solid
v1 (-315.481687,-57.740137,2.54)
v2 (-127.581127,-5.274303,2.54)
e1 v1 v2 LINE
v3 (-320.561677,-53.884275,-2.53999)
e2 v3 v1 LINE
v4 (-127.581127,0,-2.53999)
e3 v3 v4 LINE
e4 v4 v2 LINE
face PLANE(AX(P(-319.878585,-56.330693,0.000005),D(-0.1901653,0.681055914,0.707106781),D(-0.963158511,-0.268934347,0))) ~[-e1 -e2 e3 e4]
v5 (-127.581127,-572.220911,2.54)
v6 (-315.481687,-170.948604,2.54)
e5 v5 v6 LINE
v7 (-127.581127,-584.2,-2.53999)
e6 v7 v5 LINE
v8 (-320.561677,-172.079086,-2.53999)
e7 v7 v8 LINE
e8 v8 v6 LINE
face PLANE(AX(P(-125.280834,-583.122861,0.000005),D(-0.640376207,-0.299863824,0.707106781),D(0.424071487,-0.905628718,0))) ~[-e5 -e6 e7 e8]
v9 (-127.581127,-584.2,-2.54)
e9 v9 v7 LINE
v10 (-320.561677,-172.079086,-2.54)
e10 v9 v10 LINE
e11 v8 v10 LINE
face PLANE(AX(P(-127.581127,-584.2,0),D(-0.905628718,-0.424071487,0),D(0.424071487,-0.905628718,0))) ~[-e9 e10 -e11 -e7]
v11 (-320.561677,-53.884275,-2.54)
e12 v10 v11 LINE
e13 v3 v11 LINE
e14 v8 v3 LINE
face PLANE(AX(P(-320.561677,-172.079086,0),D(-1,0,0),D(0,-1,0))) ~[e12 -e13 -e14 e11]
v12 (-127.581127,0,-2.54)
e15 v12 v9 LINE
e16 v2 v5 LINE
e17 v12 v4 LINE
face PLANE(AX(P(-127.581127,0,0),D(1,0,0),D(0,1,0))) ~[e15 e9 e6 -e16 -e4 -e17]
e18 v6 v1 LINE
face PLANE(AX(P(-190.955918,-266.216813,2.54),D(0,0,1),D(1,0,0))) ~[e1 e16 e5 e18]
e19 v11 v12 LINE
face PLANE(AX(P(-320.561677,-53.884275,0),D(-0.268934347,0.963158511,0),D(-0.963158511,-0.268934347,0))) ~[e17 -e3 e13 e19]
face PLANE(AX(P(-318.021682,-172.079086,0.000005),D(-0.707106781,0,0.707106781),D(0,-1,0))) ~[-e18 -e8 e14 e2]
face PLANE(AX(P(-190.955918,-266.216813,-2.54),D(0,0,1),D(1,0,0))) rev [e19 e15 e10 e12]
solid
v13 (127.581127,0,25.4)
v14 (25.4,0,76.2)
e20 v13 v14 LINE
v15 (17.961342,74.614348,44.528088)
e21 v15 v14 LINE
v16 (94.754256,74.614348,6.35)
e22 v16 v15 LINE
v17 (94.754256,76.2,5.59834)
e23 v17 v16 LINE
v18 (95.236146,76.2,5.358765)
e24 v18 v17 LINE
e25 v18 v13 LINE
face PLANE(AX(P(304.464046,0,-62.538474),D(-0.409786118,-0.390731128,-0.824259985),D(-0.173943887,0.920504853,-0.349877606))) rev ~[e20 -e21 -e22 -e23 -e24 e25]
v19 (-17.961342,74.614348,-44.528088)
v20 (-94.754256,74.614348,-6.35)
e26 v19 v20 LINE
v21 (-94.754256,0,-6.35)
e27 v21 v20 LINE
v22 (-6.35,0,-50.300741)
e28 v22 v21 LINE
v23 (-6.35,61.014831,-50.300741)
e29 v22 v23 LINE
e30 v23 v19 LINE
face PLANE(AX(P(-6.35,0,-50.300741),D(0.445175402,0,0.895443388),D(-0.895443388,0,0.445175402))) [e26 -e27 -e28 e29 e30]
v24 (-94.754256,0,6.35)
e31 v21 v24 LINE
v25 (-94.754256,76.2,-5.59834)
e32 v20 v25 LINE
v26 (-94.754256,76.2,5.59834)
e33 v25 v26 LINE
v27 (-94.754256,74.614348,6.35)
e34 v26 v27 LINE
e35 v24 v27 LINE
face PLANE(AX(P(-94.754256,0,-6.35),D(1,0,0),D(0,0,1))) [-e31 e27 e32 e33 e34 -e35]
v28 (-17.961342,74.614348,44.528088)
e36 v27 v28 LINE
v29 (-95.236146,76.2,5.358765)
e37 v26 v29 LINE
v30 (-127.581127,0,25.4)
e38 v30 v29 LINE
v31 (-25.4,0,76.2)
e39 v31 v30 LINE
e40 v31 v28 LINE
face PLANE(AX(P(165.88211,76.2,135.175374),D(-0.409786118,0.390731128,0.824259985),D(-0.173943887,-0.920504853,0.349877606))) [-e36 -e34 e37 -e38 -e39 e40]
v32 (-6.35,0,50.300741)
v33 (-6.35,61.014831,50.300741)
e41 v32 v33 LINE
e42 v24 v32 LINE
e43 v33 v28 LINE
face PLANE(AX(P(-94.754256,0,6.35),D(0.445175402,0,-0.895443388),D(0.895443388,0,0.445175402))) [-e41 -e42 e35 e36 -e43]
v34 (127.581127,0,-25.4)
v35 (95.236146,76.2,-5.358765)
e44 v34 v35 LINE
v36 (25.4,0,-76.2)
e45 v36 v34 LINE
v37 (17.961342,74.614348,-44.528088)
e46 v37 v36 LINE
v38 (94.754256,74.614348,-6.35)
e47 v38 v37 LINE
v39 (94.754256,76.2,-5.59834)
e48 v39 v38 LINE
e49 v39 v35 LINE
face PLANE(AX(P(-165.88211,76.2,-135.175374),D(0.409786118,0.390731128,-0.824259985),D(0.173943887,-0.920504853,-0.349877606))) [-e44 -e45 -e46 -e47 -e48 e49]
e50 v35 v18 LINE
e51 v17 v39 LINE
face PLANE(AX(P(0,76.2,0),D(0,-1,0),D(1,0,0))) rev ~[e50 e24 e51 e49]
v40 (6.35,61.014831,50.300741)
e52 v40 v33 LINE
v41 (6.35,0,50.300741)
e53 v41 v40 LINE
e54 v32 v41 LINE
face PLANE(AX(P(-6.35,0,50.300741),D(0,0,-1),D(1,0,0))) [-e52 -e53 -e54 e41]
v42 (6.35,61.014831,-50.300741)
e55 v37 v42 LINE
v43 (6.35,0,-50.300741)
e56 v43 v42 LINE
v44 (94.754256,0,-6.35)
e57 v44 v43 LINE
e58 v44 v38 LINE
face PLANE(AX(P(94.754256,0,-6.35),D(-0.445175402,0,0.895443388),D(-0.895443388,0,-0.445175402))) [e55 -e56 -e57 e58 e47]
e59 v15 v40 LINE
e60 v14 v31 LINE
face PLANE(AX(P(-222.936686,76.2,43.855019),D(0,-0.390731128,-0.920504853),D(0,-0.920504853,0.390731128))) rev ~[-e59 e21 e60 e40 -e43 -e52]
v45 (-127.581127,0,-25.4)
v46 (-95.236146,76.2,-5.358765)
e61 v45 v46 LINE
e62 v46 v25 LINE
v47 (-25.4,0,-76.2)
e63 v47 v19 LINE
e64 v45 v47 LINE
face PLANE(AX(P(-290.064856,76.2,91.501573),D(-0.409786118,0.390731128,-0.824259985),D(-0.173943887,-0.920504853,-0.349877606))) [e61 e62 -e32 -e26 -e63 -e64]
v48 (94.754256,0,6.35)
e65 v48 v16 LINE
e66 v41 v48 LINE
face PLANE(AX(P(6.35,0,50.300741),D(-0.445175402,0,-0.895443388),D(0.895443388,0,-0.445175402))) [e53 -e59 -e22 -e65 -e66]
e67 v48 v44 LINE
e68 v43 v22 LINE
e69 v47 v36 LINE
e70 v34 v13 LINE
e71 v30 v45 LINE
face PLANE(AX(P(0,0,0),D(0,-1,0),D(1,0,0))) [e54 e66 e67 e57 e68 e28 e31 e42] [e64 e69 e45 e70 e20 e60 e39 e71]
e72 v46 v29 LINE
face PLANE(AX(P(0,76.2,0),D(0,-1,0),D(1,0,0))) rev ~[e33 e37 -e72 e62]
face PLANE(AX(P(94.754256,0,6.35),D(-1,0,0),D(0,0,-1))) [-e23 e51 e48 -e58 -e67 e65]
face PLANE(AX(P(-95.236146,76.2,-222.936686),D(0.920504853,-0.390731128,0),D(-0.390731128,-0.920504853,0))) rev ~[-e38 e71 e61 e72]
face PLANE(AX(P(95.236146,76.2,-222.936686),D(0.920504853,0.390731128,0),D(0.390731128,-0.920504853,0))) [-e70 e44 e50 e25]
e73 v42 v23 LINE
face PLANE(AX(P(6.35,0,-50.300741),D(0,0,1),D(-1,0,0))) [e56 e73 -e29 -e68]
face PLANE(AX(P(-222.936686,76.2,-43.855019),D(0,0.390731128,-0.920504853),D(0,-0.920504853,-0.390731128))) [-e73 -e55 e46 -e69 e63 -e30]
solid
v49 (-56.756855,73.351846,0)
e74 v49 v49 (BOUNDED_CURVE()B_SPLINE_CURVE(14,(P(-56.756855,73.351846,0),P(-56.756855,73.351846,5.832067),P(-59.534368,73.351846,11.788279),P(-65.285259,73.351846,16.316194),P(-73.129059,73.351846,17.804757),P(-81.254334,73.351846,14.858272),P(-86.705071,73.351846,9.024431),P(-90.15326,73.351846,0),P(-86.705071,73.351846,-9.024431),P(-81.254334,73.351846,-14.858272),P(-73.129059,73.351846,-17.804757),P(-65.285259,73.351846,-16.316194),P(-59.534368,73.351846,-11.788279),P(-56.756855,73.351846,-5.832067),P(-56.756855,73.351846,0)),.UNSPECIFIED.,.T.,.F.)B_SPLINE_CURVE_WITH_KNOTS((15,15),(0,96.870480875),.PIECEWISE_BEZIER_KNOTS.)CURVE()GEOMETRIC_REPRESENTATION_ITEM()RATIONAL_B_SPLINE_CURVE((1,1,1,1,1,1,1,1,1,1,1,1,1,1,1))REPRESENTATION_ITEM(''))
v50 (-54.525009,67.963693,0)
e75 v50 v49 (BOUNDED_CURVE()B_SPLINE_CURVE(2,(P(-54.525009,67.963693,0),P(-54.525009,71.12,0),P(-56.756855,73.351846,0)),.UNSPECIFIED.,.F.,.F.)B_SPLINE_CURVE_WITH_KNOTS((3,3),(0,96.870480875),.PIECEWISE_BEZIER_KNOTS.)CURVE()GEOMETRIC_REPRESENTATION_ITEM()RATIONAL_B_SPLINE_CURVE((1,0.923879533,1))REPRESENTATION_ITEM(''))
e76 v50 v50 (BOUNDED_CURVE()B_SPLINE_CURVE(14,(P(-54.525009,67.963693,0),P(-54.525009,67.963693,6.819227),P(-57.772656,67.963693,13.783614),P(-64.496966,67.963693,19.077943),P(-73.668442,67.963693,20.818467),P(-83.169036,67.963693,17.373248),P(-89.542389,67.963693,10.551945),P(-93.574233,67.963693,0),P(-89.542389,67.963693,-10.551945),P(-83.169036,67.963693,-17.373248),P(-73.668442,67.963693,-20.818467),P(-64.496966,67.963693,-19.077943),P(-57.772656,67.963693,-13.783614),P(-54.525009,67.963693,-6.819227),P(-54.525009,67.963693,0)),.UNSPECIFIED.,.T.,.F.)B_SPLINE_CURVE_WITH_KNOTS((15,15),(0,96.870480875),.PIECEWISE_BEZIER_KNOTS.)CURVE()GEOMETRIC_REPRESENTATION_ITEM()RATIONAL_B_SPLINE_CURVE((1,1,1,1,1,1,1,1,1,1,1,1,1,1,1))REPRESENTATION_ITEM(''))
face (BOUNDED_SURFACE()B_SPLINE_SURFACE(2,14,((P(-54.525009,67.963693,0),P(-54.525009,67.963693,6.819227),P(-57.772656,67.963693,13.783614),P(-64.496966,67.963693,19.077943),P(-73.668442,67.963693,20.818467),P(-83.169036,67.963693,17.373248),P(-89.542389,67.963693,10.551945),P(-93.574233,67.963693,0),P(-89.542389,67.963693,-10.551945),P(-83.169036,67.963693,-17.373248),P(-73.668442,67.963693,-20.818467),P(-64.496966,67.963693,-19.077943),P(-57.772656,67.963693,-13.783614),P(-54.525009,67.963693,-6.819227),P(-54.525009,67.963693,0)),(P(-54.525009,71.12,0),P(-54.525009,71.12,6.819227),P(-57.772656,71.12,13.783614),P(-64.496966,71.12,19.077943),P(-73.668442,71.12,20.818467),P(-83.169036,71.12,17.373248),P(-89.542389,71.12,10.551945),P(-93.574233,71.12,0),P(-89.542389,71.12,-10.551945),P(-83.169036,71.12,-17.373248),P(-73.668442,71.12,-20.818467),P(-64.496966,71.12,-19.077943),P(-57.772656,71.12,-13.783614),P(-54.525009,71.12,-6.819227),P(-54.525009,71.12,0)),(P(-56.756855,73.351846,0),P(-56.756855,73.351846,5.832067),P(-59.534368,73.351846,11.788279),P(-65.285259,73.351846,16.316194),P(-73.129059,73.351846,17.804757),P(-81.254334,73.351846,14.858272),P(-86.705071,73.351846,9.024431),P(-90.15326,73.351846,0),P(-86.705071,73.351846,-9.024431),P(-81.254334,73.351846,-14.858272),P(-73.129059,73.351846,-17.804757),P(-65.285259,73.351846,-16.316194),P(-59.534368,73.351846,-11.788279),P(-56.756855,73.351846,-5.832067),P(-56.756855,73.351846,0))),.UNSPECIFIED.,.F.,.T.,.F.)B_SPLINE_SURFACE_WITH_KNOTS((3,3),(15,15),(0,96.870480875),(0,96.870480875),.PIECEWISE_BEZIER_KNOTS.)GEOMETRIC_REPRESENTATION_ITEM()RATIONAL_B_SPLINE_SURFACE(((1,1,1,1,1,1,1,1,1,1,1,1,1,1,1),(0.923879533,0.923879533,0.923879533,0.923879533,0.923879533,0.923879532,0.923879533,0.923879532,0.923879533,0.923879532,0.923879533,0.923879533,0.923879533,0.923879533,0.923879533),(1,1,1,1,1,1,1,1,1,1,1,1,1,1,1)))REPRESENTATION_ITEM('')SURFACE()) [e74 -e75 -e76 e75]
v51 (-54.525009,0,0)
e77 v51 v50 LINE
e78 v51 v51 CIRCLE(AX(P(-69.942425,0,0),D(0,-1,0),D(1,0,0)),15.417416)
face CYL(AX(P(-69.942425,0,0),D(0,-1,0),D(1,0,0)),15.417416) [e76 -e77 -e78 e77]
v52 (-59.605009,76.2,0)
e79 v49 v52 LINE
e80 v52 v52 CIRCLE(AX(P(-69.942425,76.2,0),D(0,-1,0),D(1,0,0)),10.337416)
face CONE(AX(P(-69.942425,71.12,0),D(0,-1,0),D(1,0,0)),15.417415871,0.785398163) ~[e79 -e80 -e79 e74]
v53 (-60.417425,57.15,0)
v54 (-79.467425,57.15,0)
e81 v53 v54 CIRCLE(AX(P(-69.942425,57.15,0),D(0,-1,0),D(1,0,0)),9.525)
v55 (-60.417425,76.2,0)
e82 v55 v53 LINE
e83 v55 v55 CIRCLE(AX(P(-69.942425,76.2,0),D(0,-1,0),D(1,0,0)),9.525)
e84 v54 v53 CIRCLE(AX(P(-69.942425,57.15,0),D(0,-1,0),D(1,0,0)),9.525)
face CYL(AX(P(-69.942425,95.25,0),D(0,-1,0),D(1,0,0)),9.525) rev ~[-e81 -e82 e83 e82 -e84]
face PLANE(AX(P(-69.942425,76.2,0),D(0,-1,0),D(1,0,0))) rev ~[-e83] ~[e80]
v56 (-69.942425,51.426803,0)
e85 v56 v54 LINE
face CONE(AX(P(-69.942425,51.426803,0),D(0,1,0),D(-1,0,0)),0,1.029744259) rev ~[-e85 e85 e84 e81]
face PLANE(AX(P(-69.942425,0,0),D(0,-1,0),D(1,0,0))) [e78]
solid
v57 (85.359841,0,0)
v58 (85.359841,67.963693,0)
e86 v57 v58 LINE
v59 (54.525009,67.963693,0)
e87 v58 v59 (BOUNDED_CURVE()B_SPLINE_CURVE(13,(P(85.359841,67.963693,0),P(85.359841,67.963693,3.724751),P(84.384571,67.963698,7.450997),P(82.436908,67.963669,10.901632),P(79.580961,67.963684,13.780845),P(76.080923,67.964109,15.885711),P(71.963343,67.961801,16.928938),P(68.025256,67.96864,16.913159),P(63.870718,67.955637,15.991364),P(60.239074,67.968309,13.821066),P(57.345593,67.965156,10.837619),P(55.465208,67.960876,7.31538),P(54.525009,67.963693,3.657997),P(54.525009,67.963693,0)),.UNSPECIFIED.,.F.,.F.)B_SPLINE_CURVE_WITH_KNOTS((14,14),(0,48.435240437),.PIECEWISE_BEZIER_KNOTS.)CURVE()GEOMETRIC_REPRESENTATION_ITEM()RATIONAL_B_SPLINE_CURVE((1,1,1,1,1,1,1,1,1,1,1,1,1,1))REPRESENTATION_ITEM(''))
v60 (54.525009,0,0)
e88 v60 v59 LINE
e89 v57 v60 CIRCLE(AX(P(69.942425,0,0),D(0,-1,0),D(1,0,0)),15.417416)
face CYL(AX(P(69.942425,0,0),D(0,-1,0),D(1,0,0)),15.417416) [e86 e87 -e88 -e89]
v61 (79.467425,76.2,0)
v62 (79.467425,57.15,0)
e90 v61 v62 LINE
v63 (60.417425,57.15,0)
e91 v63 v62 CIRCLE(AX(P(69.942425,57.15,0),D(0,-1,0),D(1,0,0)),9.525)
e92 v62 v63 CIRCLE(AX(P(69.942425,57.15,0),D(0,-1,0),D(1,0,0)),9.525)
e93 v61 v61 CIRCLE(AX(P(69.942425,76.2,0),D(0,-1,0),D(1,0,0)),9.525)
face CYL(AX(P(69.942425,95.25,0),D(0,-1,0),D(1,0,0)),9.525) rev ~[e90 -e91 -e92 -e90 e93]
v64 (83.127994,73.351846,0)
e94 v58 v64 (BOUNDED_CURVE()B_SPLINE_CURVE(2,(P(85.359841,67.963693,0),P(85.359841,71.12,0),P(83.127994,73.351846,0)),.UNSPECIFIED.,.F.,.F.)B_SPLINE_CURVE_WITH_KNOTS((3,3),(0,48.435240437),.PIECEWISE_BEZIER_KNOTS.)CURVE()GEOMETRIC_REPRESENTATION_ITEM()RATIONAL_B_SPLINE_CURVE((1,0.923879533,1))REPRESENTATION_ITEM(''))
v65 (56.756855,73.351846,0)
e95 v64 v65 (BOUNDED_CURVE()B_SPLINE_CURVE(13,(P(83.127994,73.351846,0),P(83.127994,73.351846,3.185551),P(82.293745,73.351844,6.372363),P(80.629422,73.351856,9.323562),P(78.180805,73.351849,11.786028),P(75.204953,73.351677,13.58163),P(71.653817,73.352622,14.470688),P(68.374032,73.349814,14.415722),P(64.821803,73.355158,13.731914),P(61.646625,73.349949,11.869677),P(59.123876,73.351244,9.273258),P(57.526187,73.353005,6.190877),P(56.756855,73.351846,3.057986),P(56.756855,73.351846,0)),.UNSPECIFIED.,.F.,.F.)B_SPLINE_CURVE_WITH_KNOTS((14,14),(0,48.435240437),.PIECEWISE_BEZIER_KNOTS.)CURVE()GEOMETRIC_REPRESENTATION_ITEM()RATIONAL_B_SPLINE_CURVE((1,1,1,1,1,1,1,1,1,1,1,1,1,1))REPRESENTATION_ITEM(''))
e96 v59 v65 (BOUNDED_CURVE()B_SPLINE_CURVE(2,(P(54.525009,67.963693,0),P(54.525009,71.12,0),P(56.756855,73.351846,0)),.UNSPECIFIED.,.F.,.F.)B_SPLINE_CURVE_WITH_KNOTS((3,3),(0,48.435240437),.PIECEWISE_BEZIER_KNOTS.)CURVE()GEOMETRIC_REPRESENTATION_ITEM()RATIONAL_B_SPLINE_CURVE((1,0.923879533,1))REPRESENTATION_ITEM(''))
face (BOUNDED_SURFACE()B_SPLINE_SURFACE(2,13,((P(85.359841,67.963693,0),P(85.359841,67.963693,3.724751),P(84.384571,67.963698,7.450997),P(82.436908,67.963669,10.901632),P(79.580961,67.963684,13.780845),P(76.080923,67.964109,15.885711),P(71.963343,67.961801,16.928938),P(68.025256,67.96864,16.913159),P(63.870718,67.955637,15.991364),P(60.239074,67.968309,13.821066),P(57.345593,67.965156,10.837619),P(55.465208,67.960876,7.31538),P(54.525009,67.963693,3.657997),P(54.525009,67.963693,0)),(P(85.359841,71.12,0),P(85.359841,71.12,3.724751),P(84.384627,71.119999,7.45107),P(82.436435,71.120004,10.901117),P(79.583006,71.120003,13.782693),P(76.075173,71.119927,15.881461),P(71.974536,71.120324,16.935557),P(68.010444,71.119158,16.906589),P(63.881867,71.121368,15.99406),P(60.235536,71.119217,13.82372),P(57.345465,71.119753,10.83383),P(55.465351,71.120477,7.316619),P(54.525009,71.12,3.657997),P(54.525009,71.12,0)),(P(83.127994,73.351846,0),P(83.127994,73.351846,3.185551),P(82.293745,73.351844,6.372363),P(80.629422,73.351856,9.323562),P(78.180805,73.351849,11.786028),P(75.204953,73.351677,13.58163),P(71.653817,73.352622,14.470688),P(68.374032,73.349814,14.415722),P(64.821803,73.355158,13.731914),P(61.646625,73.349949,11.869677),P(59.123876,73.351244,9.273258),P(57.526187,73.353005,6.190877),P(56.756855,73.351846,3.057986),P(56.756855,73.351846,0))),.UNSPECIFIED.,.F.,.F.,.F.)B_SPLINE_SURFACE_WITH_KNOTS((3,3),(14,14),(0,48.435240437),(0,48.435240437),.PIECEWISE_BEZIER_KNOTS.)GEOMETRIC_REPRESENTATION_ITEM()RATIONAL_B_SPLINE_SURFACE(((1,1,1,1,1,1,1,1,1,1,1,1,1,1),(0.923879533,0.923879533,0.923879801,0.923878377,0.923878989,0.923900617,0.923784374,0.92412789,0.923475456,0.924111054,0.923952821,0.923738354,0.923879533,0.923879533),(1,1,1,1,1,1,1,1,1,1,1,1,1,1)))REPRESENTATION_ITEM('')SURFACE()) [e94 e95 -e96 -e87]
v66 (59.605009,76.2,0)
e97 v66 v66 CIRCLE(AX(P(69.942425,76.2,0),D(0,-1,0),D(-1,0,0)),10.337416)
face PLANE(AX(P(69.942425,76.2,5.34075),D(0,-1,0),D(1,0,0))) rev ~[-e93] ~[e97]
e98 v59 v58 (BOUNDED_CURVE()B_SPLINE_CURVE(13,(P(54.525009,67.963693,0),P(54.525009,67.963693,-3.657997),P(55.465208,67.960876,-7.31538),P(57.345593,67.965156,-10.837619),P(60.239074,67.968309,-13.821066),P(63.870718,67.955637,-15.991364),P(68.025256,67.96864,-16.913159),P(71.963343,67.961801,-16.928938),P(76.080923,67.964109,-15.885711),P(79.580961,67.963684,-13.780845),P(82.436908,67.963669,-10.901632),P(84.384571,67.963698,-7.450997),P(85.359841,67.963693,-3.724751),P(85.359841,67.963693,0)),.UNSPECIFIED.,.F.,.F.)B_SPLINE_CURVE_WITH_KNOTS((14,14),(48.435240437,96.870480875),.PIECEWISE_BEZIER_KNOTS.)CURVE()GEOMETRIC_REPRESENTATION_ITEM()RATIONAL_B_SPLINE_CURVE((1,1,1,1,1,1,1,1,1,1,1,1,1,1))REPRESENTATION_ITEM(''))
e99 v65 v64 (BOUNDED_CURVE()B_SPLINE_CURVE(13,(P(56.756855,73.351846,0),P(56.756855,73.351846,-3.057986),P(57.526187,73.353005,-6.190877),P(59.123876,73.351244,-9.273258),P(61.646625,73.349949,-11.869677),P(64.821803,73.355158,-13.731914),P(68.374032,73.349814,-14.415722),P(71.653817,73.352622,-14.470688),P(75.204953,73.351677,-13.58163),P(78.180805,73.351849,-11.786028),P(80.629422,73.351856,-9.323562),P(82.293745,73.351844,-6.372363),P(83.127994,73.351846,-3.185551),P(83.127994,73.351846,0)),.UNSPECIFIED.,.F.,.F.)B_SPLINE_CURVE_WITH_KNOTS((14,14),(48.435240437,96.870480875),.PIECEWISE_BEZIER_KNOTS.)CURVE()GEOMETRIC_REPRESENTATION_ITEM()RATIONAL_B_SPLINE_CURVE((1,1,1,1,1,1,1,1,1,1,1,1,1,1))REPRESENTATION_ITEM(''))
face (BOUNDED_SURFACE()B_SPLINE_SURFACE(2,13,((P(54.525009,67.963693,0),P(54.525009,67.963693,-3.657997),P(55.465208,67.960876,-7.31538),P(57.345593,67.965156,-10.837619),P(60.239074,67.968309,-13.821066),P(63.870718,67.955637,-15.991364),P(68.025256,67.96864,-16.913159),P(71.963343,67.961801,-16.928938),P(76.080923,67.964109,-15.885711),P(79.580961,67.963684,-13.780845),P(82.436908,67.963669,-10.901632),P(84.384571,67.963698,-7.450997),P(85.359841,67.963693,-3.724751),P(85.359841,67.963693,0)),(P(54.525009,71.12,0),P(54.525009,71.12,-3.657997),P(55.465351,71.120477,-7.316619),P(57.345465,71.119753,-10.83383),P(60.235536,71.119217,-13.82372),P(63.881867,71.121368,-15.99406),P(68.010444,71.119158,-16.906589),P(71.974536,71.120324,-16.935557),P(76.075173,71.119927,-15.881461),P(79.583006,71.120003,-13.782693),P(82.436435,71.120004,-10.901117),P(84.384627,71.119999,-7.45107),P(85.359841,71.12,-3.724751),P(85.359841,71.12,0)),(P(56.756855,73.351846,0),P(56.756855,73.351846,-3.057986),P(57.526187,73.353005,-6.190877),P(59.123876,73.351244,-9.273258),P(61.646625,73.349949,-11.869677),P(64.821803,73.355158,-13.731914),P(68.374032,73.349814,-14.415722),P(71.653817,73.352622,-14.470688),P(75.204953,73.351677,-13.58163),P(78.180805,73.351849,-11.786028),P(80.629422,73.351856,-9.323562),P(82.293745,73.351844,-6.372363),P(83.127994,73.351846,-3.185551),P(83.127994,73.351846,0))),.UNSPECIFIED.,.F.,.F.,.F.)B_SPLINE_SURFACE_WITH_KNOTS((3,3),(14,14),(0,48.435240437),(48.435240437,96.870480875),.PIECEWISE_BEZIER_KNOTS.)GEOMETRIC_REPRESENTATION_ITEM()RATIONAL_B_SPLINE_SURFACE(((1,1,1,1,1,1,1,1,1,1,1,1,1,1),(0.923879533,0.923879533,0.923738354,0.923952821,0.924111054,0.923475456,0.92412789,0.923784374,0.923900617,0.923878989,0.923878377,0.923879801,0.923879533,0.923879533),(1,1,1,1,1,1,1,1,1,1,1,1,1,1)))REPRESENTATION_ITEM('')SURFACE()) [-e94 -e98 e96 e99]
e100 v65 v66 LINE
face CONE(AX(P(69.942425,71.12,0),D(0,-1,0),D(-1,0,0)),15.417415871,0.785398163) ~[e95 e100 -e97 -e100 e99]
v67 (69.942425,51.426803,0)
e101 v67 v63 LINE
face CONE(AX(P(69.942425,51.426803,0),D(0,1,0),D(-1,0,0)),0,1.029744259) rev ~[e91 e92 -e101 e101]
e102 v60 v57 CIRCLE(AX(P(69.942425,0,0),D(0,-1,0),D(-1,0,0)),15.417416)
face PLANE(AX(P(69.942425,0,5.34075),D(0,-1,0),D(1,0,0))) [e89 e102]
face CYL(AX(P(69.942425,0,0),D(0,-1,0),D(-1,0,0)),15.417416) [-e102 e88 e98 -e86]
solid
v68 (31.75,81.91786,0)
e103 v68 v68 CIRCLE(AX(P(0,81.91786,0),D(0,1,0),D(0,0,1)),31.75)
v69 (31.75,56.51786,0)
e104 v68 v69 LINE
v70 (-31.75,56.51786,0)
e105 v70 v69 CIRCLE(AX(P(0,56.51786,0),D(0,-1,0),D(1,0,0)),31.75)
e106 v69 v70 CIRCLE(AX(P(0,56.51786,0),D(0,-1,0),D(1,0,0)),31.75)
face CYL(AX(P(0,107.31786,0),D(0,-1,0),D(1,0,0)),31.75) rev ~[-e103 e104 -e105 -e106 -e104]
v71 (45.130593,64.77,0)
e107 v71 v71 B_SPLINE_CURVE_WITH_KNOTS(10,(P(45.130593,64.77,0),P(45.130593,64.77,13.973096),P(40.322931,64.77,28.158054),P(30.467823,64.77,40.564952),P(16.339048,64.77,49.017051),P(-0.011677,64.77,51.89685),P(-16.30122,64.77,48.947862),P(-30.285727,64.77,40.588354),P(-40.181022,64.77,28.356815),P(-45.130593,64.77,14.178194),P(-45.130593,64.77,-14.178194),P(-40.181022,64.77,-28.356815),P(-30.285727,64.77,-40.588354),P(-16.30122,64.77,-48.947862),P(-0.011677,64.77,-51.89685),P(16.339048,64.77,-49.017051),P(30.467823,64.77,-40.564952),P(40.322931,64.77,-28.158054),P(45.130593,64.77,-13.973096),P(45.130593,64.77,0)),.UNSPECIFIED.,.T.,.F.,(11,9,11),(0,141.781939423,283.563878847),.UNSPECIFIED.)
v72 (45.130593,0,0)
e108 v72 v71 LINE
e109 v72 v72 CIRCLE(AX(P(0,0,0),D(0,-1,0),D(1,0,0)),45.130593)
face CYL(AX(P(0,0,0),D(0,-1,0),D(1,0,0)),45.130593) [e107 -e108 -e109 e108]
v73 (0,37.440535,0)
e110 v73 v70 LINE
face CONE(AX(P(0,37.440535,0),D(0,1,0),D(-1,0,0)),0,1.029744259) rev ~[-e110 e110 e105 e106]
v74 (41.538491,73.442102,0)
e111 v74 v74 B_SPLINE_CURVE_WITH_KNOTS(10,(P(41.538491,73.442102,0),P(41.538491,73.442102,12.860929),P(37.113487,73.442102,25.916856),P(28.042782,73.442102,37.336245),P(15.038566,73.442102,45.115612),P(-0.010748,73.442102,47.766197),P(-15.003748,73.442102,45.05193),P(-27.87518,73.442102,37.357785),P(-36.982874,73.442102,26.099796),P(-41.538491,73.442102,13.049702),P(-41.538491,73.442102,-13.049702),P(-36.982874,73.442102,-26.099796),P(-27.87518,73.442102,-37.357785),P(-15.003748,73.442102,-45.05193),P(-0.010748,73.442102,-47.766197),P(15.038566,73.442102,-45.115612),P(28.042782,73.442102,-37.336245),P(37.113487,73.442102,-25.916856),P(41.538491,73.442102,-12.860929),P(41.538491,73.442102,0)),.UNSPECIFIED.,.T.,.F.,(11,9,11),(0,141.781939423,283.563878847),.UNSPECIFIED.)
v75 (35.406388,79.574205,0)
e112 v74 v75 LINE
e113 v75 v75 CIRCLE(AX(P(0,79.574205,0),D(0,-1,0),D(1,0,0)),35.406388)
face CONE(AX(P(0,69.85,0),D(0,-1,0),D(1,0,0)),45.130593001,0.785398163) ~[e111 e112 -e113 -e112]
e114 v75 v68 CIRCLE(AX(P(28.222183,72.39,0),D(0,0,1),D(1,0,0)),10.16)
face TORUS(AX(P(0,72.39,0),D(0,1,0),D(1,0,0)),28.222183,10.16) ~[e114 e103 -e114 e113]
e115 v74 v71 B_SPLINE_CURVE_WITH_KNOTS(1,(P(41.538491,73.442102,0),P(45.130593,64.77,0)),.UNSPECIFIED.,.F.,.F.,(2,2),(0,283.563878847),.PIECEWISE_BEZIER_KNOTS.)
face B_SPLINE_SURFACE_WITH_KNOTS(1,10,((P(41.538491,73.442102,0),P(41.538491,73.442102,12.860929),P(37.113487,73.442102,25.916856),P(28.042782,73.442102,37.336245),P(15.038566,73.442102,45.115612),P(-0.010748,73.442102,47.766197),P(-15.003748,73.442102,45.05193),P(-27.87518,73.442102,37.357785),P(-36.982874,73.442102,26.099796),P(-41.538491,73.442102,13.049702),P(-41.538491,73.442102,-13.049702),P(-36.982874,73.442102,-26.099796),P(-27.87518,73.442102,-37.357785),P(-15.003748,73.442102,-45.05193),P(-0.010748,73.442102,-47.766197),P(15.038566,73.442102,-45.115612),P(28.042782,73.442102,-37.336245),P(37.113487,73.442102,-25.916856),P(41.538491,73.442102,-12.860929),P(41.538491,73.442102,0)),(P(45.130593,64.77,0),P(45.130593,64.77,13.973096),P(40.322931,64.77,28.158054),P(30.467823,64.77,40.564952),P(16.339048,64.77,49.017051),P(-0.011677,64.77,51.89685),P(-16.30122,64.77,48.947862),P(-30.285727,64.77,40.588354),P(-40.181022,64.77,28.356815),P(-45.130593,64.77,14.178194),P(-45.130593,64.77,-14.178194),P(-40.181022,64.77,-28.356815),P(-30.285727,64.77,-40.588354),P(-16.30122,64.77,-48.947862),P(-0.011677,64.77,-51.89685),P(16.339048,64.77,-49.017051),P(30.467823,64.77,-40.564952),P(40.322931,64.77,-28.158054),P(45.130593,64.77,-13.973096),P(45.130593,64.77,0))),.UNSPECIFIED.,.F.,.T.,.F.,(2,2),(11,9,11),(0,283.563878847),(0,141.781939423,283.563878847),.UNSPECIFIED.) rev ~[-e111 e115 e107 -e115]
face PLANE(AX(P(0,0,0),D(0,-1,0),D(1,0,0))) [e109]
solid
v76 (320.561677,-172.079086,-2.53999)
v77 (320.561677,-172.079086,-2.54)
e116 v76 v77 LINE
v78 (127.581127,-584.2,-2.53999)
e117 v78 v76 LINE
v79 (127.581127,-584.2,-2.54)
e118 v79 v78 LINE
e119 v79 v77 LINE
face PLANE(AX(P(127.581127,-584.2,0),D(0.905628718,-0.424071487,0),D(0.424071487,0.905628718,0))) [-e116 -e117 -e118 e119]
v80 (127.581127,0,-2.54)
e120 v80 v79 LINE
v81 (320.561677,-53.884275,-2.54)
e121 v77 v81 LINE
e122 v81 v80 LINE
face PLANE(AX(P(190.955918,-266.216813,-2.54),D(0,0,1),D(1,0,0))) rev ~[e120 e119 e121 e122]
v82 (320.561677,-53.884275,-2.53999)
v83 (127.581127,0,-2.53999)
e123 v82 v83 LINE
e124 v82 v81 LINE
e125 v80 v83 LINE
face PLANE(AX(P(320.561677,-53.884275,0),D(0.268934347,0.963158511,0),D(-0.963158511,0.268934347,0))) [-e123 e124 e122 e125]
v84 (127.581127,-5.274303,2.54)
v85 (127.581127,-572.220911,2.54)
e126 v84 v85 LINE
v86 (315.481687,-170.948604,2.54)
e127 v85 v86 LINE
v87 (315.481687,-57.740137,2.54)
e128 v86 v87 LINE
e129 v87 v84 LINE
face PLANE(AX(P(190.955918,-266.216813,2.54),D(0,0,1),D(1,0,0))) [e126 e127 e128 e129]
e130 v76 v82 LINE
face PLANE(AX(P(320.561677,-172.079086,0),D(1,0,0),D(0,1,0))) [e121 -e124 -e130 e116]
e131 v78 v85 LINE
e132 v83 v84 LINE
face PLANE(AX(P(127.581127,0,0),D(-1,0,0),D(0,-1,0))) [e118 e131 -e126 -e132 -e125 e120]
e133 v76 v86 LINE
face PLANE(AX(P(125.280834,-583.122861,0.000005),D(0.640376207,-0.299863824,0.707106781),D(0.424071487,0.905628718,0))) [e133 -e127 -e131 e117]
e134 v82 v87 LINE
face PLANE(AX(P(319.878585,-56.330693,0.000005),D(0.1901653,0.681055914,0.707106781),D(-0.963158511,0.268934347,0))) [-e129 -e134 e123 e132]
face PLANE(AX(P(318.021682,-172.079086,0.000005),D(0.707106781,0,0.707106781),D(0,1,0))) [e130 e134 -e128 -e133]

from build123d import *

# Parameters (mm, degrees)
F1_DEPTH         = 2.54
F1_DEPTH_BACK    = 2.54
F2_SIZE          = 5.07999
F5_DEPTH         = 76.2
F6_T1_DEPTH      = 509.1856975688
F6_T3_DEPTH      = 445.8733729354
F6_T5_DEPTH      = 509.1856975688
F6_T7_DEPTH      = 445.8733729354
F6_T9_DEPTH      = 509.1856975688
F6_T11_DEPTH     = 509.1856975688
F4_R             = 45.1305930008
F7_DEPTH         = 82.55
F8_DEPTH         = 76.2
F4_R_2           = 15.4174158708
F9_SIZE          = 12.7
F10_R            = 10.16
F12_D            = 63.5
F12_DEPTH        = 25.4
F12_START        = 0.6321404
F12_TIP          = 19.0773246541
F13_SIZE         = 5.08
F15_R            = 7.62
F15_2_R          = 7.62
F18_D            = 19.05
F18_DEPTH        = 19.05
F18_TIP          = 5.7231973962
F18_ON_F17_D     = 19.05
F18_ON_F17_DEPTH = 19.05
F18_ON_F17_TIP   = 5.7231973962


# Not quite as in the source:
# - a fillet or chamfer that OpenCascade refuses, or shapes differently, is made with other operations: its cross-section is extruded or revolved along the edge and cut away or added
# - a fillet or chamfer is up to 0.001 mm smaller than in the source, because OpenCascade refuses the exact size


with BuildPart() as f1:
    # F0 (on Top) → F1 (new body, two sides)
    with BuildSketch(Plane.XY) as f1_sk:
        Polygon((320.5616772175, -53.8842752576), (127.5811266, 0), (127.5811266, -584.2), (320.5616772175, -172.0790863037), align=None)
    extrude(amount=F1_DEPTH)
    extrude(f1_sk.sketch, amount=-F1_DEPTH_BACK)

    # F2 (size 5.08 in the source; OpenCascade refuses exactly that, so slightly less here)
    f2_edges = [f1.edges().sort_by_distance(p)[0] for p in [
        (224.071402, -378.139543, 2.54),
        (320.561677, -112.981681, 2.54),
        (224.071402, -26.942138, 2.54),
    ]]
    chamfer(f2_edges, length=F2_SIZE)


with BuildPart() as f3_1:
    # F3: instance of F1
    add(f1.part.mirror(Plane.YZ))


with BuildPart() as f5:
    # F4 (on Front) → F5 (new body)
    with BuildSketch(Plane.XZ):
        Polygon((-127.5811266, 25.4), (-127.5811266, 0), (-127.5811266, -25.4), (-25.4, -76.2), (0, -76.2), (25.4, -76.2), (127.5811266, -25.4), (127.5811266, 0), (127.5811266, 25.4), (25.4, 76.2), (0, 76.2), (-25.4, 76.2), align=None)
        Polygon((94.7542563081, 6.35), (94.7542563081, 0), (94.7542563081, -6.35), (6.35, -50.3007409038), (-6.35, -50.3007409038), (-94.7542563081, -6.35), (-94.7542563081, 6.35), (-6.35, 50.3007409038), (6.35, 50.3007409038), align=None, mode=Mode.SUBTRACT)
    extrude(amount=-F5_DEPTH)

    # F6: chamfer of 76.2 x 32.3449809952 on 8 edges, made by hand

    # F6_s2 → F6_t1 (cut)
    with BuildSketch(Plane(origin=(269.0546874739, 0, -133.7622570671), x_dir=(0, 1, 0), z_dir=(-0.8954433882, 0, 0.4451754021))):
        Polygon((0, -79.54024139), (76.2, -47.1952603949), (76.2, -79.54024139), align=None)
    extrude(amount=F6_T1_DEPTH, mode=Mode.SUBTRACT)

    # F6_s4 → F6_t3 (cut)
    with BuildSketch(Plane.YZ.offset(-222.9366864677)):
        Polygon((76.2, 43.8550190048), (0, 76.2), (76.2, 76.2), align=None)
        Polygon((76.2, -43.8550190048), (0, -76.2), (76.2, -76.2), align=None)
    extrude(amount=F6_T3_DEPTH, mode=Mode.SUBTRACT)

    # F6_s6 → F6_t5 (cut)
    with BuildSketch(Plane(origin=(186.8922787572, 0, 92.9146905772), x_dir=(0, 1, 0), z_dir=(-0.8954433882, 0, -0.4451754021))):
        Polygon((76.2, -47.1952603949), (0, -79.54024139), (76.2, -79.54024139), align=None)
    extrude(amount=F6_T5_DEPTH, mode=Mode.SUBTRACT)

    # F6_s8 → F6_t7 (cut)
    with BuildSketch(Plane.XY.offset(-222.9366864677)):
        Polygon((-95.2361456048, 76.2), (-127.5811266, 0), (-127.5811266, 76.2), align=None)
        Polygon((95.2361456048, 76.2), (127.5811266, 0), (127.5811266, 76.2), align=None)
    extrude(amount=F6_T7_DEPTH, mode=Mode.SUBTRACT)

    # F6_s10 → F6_t9 (cut)
    with BuildSketch(Plane(origin=(-269.0546874739, 0, 133.7622570671), x_dir=(0, 1, 0), z_dir=(0.8954433882, 0, -0.4451754021))):
        Polygon((76.2, -47.1952603949), (0, -79.54024139), (76.2, -79.54024139), align=None)
    extrude(amount=F6_T9_DEPTH, mode=Mode.SUBTRACT)

    # F6_s12 → F6_t11 (cut)
    with BuildSketch(Plane(origin=(-186.8922787572, 0, -92.9146905772), x_dir=(0, 1, 0), z_dir=(0.8954433882, 0, 0.4451754021))):
        Polygon((76.2, -47.1952603949), (0, -79.54024139), (76.2, -79.54024139), align=None)
    extrude(amount=F6_T11_DEPTH, mode=Mode.SUBTRACT)


with BuildPart() as f7:
    # F4 (on Front) → F7 (new body)
    with BuildSketch(Plane.XZ):
        Circle(F4_R)
    extrude(amount=-F7_DEPTH)

    # F9
    f9_edges = [f7.edges().sort_by_distance(p)[0] for p in [
        (-45.130593, 82.55, 0),
    ]]
    chamfer(f9_edges, length=F9_SIZE)

    # F10
    f10_edges = [f7.edges().sort_by_distance(p)[0] for p in [
        (-32.430593, 82.55, 0),
    ]]
    fillet(f10_edges, radius=F10_R)

    # F12
    # its depths count from where the whole tool has entered the part; down to there all is cleared
    with Locations(Plane(origin=(0, 82.55, 0), x_dir=(-1, 0, 0), z_dir=(0, 1, 0)).offset(-F12_START)):
        with Locations((0, 0)):
            Hole(F12_D / 2, depth=F12_DEPTH)
            with Locations((0, 0, -(F12_DEPTH + F12_TIP / 2))):  # 118° drill point
                Cone(0, F12_D / 2, F12_TIP, mode=Mode.SUBTRACT)

    # F13
    f13_edges = [f7.edges().sort_by_distance(p)[0] for p in [
        (-45.130593, 69.85, 0),
    ]]
    chamfer(f13_edges, length=F13_SIZE)


with BuildPart() as f8:
    # F4 (on Front) → F8 (new body)
    with BuildSketch(Plane.XZ):
        with BuildLine():
            Line((54.5250087836, 0), (85.3598405253, 0))
            ThreePointArc((85.3598405253, 0), (69.9424246545, 15.4174158708), (54.5250087836, 0))
        make_face()
        with BuildLine():
            ThreePointArc((54.5250087836, 0), (69.9424246545, -15.4174158708), (85.3598405253, 0))
            Line((85.3598405253, 0), (54.5250087836, 0))
        make_face()
    extrude(amount=-F8_DEPTH)

    # F14: chamfer of 5.08 on 1 edges, made by hand

    # F14_s1 → F14_t2 (revolve, cut)
    with BuildSketch(Plane.XY):
        Polygon((54.5250087836, 71.12), (59.6050087836, 76.2), (54.5250087836, 76.2), align=None)
    revolve(axis=Axis((69.9424246545, 76.2, 0), (0, -1, 0)), mode=Mode.SUBTRACT)

    # F15
    f15_edges = [f8.edges().sort_by_distance(p)[0] for p in [
        (85.359841, 71.12, 0),
    ]]
    fillet(f15_edges, radius=F15_R)

    # F18
    with Locations(Plane(origin=(0, 76.2, 0), x_dir=(-1, 0, 0), z_dir=(0, 1, 0))):
        with Locations((-69.9424246545, 0)):
            Hole(F18_D / 2, depth=F18_DEPTH)
            with Locations((0, 0, -(F18_DEPTH + F18_TIP / 2))):  # 118° drill point
                Cone(0, F18_D / 2, F18_TIP, mode=Mode.SUBTRACT)


with BuildPart() as f8b:
    # F4 (on Front) → F8, piece 2 (new body)
    with BuildSketch(Plane.XZ):
        with Locations((-69.9424246545, 0)):
            Circle(F4_R_2)
    extrude(amount=-F8_DEPTH)

    # F14#2: chamfer of 5.08 on 1 edges, made by hand

    # F14_2_s1 → F14_2_t2 (revolve, cut)
    with BuildSketch(Plane.XY):
        Polygon((-54.5250087836, 71.12), (-59.6050087836, 76.2), (-54.5250087836, 76.2), align=None)
    revolve(axis=Axis((-69.9424246545, 76.2, 0), (0, -1, 0)), mode=Mode.SUBTRACT)

    # F15#2
    f15_2_edges = [f8b.edges().sort_by_distance(p)[0] for p in [
        (-85.359841, 71.12, 0),
    ]]
    fillet(f15_2_edges, radius=F15_2_R)

    # F18 on F17
    with Locations(Plane(origin=(0, 76.2, 0), x_dir=(-1, 0, 0), z_dir=(0, 1, 0))):
        with Locations((69.9424246545, 0)):
            Hole(F18_ON_F17_D / 2, depth=F18_ON_F17_DEPTH)
            with Locations((0, 0, -(F18_ON_F17_DEPTH + F18_ON_F17_TIP / 2))):  # 118° drill point
                Cone(0, F18_ON_F17_D / 2, F18_ON_F17_TIP, mode=Mode.SUBTRACT)


solid = Compound([f1.part, f3_1.part, f5.part, f7.part, f8.part, f8b.part])
